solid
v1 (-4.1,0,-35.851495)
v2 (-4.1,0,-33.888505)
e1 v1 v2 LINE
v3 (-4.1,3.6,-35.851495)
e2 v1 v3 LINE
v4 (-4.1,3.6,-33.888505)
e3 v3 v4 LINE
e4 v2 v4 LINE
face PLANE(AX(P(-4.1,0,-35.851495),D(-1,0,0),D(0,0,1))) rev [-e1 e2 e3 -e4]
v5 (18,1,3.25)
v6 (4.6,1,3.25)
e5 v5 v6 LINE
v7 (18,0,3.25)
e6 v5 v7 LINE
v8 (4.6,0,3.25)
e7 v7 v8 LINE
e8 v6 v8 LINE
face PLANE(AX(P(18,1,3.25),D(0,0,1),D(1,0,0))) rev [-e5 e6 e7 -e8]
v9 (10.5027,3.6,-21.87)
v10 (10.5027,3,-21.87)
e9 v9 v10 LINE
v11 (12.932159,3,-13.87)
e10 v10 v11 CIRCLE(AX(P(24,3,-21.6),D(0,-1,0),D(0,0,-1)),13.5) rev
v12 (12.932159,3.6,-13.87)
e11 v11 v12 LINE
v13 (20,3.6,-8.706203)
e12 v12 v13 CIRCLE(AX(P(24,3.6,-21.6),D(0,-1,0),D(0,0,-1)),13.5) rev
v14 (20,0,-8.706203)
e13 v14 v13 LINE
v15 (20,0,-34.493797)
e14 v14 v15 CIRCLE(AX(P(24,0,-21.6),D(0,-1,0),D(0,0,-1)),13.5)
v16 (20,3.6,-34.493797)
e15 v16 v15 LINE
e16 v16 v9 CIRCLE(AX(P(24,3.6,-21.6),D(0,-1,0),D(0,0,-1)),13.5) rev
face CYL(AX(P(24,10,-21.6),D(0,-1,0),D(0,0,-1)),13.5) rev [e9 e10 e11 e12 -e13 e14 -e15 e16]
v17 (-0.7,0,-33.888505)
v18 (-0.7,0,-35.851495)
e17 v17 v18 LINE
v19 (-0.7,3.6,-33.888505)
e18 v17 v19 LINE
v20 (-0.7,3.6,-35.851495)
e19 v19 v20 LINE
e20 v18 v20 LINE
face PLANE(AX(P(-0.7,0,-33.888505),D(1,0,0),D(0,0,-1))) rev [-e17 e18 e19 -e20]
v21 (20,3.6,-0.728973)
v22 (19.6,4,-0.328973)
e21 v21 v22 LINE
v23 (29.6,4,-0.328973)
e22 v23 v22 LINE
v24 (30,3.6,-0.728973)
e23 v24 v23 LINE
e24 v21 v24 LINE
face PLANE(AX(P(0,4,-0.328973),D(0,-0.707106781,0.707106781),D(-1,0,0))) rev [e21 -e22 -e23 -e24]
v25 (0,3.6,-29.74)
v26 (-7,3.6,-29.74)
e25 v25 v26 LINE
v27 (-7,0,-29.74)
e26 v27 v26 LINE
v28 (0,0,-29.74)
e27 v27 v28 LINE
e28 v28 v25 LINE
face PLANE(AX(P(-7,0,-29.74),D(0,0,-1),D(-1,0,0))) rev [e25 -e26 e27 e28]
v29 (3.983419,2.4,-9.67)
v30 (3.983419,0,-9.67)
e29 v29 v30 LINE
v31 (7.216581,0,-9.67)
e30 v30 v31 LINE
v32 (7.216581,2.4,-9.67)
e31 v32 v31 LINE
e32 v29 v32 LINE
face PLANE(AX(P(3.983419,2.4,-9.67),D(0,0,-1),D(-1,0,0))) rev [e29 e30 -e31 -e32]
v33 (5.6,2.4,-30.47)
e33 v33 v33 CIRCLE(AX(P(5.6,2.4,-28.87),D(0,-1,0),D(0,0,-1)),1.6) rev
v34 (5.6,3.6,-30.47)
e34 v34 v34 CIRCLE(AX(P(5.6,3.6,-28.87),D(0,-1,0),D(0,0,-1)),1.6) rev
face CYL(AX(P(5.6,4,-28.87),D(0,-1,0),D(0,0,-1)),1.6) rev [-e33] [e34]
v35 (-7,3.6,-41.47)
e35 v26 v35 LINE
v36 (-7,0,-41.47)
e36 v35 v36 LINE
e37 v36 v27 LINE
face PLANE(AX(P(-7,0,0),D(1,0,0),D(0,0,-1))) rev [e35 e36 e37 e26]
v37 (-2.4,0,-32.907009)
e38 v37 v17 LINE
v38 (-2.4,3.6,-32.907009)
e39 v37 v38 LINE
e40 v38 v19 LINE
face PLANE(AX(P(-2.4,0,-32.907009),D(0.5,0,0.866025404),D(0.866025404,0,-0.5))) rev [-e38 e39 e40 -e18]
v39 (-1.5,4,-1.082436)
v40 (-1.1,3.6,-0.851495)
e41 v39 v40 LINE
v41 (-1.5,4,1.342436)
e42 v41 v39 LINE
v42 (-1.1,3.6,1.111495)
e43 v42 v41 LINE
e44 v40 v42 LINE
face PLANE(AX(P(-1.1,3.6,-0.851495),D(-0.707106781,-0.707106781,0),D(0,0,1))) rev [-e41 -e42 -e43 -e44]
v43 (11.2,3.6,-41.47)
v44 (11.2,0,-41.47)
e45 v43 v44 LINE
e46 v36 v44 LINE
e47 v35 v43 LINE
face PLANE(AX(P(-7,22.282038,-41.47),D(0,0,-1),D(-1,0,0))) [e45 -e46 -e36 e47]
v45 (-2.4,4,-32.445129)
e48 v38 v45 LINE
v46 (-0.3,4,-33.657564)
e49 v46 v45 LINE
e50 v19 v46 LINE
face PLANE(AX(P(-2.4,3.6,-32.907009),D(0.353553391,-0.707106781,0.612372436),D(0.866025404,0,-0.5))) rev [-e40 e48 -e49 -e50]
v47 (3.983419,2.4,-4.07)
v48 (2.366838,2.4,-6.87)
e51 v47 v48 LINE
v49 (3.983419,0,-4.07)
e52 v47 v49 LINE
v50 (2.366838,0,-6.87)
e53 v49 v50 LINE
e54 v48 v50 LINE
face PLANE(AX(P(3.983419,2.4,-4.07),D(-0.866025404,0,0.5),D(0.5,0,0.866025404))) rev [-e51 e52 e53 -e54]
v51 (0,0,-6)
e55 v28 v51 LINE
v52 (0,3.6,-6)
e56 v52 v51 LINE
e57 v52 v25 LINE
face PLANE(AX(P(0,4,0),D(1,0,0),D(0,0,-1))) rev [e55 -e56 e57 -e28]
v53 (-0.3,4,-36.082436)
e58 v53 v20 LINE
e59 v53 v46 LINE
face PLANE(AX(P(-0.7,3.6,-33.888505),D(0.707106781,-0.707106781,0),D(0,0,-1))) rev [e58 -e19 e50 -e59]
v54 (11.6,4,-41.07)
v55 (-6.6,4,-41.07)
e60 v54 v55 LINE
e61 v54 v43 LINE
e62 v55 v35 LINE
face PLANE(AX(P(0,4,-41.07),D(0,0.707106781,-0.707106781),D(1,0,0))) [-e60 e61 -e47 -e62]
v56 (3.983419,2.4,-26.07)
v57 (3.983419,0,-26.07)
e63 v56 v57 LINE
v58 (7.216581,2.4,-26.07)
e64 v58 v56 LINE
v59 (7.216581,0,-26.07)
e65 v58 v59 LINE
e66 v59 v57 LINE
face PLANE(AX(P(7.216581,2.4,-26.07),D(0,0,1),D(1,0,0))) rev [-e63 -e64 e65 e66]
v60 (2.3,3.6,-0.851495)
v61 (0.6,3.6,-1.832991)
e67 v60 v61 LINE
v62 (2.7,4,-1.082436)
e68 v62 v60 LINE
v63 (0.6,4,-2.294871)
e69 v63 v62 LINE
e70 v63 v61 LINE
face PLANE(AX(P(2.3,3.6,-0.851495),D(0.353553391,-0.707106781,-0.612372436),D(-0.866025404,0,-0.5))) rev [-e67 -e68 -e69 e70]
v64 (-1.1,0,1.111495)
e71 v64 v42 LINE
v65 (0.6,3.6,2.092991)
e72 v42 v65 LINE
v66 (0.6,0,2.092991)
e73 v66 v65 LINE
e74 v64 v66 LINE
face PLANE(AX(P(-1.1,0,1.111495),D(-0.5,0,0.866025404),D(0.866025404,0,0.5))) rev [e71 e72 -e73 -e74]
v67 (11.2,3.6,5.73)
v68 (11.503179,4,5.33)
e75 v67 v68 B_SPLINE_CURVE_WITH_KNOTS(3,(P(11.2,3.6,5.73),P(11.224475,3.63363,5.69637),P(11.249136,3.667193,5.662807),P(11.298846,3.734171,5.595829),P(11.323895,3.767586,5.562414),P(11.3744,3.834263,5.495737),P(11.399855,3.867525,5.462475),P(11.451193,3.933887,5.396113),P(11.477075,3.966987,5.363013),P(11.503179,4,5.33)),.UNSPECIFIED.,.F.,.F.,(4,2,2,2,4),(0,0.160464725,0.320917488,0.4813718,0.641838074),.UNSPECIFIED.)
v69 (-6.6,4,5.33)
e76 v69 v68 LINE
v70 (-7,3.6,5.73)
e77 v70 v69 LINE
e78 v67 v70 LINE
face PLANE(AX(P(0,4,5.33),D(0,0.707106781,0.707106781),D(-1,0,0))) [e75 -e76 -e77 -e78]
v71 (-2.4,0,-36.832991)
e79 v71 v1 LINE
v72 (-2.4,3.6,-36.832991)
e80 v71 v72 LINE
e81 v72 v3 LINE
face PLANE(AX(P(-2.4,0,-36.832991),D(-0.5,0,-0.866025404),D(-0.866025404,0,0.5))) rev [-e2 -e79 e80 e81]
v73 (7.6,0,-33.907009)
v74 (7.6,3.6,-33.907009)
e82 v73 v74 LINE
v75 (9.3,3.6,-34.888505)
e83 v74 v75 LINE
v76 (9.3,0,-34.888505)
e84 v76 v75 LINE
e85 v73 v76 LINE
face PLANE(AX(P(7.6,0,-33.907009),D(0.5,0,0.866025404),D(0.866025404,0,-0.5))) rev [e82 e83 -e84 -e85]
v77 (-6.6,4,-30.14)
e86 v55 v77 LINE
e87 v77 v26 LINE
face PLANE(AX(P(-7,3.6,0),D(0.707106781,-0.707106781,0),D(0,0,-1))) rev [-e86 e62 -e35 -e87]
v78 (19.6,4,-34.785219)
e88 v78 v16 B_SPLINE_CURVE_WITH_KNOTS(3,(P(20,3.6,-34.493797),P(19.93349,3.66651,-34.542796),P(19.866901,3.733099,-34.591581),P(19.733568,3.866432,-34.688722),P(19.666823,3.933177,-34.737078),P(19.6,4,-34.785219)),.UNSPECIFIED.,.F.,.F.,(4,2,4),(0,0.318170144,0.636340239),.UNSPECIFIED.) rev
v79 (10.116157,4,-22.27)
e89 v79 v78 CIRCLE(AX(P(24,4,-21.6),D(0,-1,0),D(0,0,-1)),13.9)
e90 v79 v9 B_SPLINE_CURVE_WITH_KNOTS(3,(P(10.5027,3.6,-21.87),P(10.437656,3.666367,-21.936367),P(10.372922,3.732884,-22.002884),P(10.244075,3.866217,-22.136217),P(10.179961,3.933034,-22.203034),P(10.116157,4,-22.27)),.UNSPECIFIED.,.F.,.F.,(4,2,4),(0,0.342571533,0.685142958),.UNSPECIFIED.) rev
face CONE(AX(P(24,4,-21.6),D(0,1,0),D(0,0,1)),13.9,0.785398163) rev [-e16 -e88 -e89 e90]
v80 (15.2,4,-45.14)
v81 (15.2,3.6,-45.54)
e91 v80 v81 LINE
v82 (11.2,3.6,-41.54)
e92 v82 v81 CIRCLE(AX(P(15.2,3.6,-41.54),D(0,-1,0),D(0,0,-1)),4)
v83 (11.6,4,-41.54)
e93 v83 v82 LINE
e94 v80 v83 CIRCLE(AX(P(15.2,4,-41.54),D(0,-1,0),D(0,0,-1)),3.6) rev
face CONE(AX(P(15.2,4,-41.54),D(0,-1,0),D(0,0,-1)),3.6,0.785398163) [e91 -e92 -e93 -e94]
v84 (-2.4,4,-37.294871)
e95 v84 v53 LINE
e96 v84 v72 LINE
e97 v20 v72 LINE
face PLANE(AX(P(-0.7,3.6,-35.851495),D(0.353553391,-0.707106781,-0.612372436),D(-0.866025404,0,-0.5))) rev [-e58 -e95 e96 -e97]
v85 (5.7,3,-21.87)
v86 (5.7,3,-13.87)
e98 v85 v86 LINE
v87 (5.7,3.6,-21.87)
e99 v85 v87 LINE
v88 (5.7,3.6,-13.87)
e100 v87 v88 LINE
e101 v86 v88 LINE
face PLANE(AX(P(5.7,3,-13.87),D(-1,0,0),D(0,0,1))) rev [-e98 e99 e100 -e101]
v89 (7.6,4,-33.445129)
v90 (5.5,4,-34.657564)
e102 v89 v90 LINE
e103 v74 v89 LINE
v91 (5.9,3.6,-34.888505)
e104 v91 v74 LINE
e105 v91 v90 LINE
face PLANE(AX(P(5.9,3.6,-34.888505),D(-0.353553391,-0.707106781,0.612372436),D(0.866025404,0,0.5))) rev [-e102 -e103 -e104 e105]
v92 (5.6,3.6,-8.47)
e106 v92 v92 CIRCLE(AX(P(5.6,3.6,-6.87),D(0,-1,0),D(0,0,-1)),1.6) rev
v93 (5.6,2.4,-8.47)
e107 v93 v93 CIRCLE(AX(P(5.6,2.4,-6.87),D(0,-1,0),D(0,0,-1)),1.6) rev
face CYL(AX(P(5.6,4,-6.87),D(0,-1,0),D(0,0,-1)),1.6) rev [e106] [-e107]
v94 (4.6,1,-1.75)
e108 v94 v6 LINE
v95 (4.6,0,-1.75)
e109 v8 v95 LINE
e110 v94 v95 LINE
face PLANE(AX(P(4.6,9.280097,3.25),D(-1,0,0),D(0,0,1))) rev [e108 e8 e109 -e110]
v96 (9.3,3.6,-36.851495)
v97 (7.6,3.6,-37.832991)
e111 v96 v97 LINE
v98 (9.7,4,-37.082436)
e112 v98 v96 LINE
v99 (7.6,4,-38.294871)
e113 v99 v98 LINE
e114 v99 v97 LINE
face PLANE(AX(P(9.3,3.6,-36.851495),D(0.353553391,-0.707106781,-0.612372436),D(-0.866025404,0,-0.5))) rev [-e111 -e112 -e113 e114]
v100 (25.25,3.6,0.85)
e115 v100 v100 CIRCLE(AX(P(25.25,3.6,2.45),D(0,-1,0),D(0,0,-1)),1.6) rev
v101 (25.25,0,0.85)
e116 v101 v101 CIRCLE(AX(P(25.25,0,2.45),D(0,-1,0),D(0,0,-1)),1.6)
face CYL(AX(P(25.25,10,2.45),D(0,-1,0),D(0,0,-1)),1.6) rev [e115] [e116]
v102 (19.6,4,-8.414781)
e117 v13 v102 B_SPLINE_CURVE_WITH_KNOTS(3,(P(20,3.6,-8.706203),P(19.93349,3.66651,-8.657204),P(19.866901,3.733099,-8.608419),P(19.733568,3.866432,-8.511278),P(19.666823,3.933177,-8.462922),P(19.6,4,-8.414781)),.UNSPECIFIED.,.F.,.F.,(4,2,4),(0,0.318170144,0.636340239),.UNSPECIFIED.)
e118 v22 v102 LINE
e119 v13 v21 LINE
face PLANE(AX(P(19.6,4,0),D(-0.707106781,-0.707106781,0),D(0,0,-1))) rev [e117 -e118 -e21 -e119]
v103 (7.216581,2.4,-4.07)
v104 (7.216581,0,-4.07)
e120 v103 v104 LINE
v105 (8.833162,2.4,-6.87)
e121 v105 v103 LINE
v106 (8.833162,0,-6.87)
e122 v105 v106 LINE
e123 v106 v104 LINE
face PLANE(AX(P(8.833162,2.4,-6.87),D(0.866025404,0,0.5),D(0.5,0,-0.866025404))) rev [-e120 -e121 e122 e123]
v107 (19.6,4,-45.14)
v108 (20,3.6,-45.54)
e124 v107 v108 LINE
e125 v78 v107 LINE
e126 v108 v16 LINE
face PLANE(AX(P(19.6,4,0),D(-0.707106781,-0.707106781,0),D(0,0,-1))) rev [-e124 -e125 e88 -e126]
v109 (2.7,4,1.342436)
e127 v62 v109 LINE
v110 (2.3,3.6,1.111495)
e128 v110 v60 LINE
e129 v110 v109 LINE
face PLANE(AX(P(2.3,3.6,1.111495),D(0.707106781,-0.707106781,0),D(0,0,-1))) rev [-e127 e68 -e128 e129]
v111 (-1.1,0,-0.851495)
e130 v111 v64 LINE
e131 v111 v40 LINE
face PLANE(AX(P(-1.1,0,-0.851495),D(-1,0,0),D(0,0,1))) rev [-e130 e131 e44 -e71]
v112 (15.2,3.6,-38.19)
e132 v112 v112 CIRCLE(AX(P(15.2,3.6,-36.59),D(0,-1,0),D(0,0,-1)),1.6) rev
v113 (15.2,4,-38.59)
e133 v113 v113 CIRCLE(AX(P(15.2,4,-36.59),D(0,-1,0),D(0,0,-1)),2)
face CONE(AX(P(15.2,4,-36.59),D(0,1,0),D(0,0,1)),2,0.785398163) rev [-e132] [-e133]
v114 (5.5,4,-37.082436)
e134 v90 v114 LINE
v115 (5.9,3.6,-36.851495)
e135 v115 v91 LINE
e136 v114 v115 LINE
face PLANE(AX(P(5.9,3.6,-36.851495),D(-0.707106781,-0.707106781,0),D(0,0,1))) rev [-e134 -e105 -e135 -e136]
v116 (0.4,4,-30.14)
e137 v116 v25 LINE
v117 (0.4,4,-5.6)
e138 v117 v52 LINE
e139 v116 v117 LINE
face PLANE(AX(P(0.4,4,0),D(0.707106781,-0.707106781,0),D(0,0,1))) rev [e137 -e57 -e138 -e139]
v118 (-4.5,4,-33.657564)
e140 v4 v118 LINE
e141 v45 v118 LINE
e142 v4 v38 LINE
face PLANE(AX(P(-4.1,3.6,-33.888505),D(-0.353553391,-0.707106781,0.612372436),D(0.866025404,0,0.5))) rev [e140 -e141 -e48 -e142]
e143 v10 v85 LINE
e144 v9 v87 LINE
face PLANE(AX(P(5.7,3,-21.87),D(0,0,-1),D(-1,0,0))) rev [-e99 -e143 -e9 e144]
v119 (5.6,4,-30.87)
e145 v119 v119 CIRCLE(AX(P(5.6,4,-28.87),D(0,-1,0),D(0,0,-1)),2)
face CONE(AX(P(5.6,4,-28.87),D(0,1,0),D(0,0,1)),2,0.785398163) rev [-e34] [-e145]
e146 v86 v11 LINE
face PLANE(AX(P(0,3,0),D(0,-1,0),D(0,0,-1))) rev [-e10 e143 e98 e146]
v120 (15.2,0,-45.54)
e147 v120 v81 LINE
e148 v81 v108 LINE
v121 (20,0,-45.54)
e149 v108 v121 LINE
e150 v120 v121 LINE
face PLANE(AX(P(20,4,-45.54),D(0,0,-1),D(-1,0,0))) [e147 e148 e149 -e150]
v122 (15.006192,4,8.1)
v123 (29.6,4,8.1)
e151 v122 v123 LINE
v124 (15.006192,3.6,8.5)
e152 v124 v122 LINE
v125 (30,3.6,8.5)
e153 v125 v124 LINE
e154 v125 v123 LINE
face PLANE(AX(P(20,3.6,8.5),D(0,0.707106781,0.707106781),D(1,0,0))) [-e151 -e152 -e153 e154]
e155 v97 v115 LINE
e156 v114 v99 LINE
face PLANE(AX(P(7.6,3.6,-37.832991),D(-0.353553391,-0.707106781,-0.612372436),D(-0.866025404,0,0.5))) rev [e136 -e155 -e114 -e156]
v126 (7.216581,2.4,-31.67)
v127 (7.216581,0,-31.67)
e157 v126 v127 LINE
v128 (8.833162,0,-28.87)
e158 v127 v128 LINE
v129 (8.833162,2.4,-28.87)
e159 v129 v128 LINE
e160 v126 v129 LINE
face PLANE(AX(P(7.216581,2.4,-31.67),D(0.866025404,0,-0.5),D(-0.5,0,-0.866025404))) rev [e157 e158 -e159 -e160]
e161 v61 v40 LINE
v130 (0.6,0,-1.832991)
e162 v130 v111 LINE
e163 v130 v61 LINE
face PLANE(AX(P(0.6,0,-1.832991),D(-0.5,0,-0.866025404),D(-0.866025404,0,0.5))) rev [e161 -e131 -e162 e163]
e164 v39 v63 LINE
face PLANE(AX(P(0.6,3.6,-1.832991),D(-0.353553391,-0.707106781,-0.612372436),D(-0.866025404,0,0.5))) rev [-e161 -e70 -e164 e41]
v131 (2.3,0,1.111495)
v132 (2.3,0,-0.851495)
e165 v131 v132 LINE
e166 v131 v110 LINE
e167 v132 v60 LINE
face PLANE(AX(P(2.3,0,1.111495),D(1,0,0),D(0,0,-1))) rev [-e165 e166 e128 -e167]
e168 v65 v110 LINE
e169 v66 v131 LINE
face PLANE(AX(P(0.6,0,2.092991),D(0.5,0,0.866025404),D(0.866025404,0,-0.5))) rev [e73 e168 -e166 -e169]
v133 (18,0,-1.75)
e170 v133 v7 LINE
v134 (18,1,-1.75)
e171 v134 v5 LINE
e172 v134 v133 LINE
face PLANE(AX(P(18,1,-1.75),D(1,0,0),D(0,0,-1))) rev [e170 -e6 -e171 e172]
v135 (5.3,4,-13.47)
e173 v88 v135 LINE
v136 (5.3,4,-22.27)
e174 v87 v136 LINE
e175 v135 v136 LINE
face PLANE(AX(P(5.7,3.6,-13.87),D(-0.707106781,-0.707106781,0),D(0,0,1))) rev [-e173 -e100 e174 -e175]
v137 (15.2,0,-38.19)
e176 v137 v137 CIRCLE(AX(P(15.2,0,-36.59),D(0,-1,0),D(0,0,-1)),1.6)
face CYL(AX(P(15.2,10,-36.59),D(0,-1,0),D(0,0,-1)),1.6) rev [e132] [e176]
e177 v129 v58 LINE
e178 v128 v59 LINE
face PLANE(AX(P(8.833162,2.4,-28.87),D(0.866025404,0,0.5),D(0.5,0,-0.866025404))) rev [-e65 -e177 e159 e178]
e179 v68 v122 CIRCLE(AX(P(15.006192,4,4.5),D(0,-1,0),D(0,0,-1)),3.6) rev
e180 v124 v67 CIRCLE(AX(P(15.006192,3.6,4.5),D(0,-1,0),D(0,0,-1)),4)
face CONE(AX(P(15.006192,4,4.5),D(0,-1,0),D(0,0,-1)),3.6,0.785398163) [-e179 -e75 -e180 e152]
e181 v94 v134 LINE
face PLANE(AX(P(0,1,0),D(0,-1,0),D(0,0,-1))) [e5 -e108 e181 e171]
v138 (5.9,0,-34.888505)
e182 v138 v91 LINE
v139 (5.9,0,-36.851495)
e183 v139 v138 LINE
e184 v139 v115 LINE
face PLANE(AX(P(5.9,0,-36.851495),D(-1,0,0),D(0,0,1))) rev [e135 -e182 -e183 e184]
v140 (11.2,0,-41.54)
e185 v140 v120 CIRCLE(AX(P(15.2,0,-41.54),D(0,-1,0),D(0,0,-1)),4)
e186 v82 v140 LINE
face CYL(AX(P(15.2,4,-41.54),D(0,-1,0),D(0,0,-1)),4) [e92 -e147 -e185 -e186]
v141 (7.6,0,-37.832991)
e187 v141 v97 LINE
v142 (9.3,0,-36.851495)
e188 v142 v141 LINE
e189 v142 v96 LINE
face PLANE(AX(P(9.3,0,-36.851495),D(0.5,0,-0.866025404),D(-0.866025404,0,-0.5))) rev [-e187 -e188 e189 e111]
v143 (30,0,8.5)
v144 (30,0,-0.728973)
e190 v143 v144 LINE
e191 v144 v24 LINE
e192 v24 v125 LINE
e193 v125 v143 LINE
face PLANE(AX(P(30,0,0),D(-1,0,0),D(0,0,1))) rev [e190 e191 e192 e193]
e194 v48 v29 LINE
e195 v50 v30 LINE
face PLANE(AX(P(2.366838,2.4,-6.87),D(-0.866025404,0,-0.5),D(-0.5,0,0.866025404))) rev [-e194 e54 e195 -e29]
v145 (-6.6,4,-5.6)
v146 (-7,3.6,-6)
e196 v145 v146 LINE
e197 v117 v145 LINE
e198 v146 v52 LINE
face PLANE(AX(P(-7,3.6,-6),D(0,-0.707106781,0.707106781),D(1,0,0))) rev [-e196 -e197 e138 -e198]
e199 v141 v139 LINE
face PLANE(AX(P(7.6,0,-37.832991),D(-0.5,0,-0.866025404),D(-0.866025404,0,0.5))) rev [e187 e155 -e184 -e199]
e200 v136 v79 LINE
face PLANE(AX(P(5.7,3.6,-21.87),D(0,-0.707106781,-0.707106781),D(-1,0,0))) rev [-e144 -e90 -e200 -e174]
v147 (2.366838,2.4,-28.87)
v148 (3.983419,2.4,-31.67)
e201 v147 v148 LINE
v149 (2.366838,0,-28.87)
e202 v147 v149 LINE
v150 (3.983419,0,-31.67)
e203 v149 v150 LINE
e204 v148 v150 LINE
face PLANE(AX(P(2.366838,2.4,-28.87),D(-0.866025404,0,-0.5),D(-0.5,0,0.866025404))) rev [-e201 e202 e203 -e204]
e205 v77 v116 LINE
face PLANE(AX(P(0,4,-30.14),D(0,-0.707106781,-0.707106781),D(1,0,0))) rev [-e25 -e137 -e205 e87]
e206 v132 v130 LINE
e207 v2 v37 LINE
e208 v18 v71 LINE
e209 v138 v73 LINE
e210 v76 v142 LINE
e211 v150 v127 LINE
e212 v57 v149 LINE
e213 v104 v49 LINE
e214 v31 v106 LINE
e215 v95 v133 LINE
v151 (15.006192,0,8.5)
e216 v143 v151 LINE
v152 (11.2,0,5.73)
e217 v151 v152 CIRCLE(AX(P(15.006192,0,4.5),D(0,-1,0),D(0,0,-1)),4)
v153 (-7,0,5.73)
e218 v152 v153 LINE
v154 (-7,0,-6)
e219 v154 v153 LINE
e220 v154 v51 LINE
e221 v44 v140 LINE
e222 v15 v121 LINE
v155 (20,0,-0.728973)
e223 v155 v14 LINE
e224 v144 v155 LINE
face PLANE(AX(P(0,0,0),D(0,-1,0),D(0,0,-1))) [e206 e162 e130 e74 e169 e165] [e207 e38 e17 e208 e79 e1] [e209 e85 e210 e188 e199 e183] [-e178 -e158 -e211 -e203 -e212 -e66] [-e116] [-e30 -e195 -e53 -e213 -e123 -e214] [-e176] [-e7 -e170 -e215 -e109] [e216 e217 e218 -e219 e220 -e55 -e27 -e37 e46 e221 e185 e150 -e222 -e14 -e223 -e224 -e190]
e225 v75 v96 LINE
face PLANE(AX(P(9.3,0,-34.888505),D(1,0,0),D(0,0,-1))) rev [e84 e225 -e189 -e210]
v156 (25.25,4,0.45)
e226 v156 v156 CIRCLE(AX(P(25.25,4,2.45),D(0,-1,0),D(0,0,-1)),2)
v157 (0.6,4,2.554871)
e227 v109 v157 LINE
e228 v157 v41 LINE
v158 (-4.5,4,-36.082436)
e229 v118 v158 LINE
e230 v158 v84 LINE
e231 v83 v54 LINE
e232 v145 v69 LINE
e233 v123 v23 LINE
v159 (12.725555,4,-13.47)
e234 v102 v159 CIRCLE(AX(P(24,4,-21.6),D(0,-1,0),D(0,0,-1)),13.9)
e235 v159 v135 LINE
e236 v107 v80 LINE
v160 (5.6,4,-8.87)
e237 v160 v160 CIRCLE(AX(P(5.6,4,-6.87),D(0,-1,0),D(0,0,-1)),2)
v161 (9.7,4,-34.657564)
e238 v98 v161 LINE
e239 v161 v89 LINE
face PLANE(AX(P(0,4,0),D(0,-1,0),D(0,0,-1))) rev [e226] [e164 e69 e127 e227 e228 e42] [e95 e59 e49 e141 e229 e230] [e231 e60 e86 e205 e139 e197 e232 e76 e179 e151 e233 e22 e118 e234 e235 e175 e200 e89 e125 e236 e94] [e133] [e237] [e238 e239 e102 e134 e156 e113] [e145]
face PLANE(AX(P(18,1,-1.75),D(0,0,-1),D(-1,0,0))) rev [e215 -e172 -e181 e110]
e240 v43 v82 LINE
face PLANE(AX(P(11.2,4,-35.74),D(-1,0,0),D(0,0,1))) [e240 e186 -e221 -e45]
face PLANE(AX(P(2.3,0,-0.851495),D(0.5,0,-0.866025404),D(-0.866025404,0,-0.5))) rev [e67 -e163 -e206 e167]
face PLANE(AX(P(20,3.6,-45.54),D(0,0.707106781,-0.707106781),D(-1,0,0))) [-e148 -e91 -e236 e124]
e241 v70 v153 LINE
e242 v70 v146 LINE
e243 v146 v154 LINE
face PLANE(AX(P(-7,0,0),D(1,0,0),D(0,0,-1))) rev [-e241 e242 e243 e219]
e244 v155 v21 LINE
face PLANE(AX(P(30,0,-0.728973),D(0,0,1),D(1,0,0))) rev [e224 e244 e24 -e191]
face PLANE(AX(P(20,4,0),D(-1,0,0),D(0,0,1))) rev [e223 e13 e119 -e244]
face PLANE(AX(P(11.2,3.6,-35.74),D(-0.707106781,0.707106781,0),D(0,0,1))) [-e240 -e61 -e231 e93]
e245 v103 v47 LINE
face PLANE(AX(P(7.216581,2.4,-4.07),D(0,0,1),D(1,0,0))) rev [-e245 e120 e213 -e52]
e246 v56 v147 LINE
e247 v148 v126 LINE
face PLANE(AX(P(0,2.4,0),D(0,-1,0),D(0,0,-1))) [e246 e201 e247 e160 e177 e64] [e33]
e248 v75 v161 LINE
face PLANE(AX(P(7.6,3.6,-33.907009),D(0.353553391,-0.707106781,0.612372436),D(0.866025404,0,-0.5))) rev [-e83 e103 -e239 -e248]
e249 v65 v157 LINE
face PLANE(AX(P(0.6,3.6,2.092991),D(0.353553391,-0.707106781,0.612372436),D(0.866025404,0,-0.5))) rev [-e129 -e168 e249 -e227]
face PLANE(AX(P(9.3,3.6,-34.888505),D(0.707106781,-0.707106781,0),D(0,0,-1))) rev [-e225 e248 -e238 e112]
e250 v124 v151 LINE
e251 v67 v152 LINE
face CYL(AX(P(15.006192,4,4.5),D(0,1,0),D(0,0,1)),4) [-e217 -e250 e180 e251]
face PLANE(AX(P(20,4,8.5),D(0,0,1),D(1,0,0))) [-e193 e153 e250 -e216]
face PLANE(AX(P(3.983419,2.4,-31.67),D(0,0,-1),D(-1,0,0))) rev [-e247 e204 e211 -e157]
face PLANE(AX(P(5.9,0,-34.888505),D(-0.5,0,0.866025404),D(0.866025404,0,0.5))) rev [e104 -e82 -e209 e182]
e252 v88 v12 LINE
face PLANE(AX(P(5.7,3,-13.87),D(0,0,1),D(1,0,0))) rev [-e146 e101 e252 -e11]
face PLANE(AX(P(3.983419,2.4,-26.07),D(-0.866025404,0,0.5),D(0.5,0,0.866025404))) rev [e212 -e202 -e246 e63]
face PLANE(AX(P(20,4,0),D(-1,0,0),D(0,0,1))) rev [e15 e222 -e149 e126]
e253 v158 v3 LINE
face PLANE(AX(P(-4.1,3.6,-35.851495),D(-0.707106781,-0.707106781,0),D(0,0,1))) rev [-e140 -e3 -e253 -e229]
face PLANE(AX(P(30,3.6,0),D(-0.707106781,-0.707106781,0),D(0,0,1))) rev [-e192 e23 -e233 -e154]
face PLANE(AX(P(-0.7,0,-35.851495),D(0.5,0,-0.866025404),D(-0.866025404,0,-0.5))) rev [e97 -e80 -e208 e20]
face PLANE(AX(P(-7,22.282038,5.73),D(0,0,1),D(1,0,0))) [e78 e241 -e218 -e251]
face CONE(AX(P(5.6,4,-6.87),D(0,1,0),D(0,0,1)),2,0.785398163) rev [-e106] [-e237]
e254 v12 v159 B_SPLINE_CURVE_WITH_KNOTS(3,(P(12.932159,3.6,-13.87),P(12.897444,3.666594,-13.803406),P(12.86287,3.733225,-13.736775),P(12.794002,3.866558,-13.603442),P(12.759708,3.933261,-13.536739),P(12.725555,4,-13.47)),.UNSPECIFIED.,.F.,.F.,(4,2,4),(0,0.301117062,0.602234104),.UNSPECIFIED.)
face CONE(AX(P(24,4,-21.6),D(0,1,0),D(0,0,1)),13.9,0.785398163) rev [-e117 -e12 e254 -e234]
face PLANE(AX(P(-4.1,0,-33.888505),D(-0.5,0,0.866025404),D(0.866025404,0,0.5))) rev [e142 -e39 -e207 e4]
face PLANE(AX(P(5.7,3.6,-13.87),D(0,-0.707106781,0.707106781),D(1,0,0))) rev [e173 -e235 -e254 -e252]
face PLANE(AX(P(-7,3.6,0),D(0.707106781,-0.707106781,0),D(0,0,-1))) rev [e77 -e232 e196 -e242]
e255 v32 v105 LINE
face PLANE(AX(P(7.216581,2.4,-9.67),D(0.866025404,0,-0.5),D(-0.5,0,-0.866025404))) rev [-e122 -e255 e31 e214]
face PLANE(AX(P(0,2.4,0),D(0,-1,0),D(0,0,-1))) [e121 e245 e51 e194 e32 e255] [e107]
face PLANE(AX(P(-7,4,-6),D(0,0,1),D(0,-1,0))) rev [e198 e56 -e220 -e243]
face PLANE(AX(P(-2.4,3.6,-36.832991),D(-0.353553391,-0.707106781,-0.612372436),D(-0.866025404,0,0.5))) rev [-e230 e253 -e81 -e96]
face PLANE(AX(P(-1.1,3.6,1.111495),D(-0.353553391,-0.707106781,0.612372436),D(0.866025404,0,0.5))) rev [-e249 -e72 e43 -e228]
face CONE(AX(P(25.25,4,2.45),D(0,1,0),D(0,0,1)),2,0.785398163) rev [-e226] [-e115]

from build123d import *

# Parameters (mm, degrees)
SKETCH_1_W           = 20
SKETCH_1_H           = 35.74
EXTRUDE_1_DEPTH      = 4
SKETCH_2_W           = 8.8
SKETCH_2_H           = 8.5
SKETCH_2_H_2         = 9.8
EXTRUDE_2_DEPTH      = 4
SKETCH_3_R           = 13.5
CUT_EXTRUDE_1_DEPTH  = 10
SKETCH_4_W           = 9
SKETCH_4_H           = 5
CUT_EXTRUDE_2_DEPTH  = 1
SKETCH_5_W           = 9.228972975
SKETCH_5_H           = 4
EXTRUDE_3_DEPTH      = 10
SKETCH_6_R           = 1.6
CUT_EXTRUDE_3_DEPTH  = 10
SKETCH_7_R           = 1.6
CUT_EXTRUDE_4_DEPTH  = 55.679901244
SKETCH_8_W           = 11.2
SKETCH_8_H           = 4
EXTRUDE_4_DEPTH      = 4
SKETCH_9_R           = 1.65
CUT_EXTRUDE_5_DEPTH  = 55.679901244
SKETCH_10_W          = 10
SKETCH_10_H          = 4
EXTRUDE_5_DEPTH      = 7
SKETCH_11_R          = 1.65
CUT_EXTRUDE_6_DEPTH  = 8
SKETCH_12_W          = 6.6
SKETCH_12_H          = 5
CUT_EXTRUDE_7_DEPTH  = 1
SKETCH_13_R          = 1.55
CUT_EXTRUDE_8_DEPTH  = 5
SKETCH_14_W          = 18.2
SKETCH_14_H          = 1.73
EXTRUDE_6_DEPTH      = 4
SKETCH_16_W          = 10
SKETCH_16_H          = 8
CUT_EXTRUDE_9_DEPTH  = 1
CUT_EXTRUDE_10_DEPTH = 2.4
FILLET_1_R           = 4
CUT_EXTRUDE_11_DEPTH = 55.679901244
CHAMFER_1_SIZE       = 0.4


with BuildPart() as part:
    # 草图1 → 凸台-拉伸1 (new body)
    with BuildSketch(Plane(origin=(0, 0, 0), x_dir=(1, 0, 0), z_dir=(0, 1, 0))):
        with Locations((10, 17.87)):
            Rectangle(SKETCH_1_W, SKETCH_1_H)
    extrude(amount=EXTRUDE_1_DEPTH)

    # 草图2 → 凸台-拉伸2 (add)
    with BuildSketch(Plane.XZ):
        with Locations((15.6, 4.25)):
            Rectangle(SKETCH_2_W, SKETCH_2_H)
        with Locations((15.6, -40.64)):
            Rectangle(SKETCH_2_W, SKETCH_2_H_2)
    extrude(amount=-EXTRUDE_2_DEPTH)

    # 草图3 → 切除-拉伸1 (cut)
    with BuildSketch(Plane(origin=(0, 0, 0), x_dir=(-1, 0, 0), z_dir=(0, -1, 0))):
        with Locations((-24, 21.6)):
            Circle(SKETCH_3_R)
    extrude(amount=-CUT_EXTRUDE_1_DEPTH, mode=Mode.SUBTRACT)

    # 草图4 → 切除-拉伸2 (cut)
    with BuildSketch(Plane(origin=(0, 0, 0), x_dir=(-1, 0, 0), z_dir=(0, -1, 0))):
        with Locations((-13.5, -0.75)):
            Rectangle(SKETCH_4_W, SKETCH_4_H)
    extrude(amount=-CUT_EXTRUDE_2_DEPTH, mode=Mode.SUBTRACT)

    # 草图5 → 凸台-拉伸3 (add)
    with BuildSketch(Plane(origin=(20, 0, 0), x_dir=(0, 0, -1), z_dir=(1, 0, 0))):
        with Locations((-3.885513513, 2)):
            Rectangle(SKETCH_5_W, SKETCH_5_H)
    extrude(amount=EXTRUDE_3_DEPTH)

    # 草图6 → 切除-拉伸3 (cut)
    with BuildSketch(Plane(origin=(0, 0, 0), x_dir=(-1, 0, 0), z_dir=(0, -1, 0))):
        with Locations(Location((-15.2, 36.59, 0), (0, 0, 90))):
            Circle(SKETCH_6_R)
        with Locations(Location((-25.25, -2.45, 0), (0, 0, 90))):
            Circle(SKETCH_6_R)
    extrude(amount=-CUT_EXTRUDE_3_DEPTH, mode=Mode.SUBTRACT)

    # 草图7 → 切除-拉伸4 (cut, through all)
    with BuildSketch(Plane(origin=(0, 0, 0), x_dir=(-1, 0, 0), z_dir=(0, -1, 0))):
        with Locations(Location((-5.6, 28.87, 0), (0, 0, 90))):
            Circle(SKETCH_7_R)
        with Locations(Location((-5.6, 6.87, 0), (0, 0, 90))):
            Circle(SKETCH_7_R)
    extrude(amount=-CUT_EXTRUDE_4_DEPTH, mode=Mode.SUBTRACT)

    # 草图8 → 凸台-拉伸4 (add)
    with BuildSketch(Plane.XZ):
        with Locations((5.6, -37.74)):
            Rectangle(SKETCH_8_W, SKETCH_8_H)
        with Locations((5.6, 2)):
            Rectangle(SKETCH_8_W, SKETCH_8_H)
    extrude(amount=-EXTRUDE_4_DEPTH)

    # 草图9 → 切除-拉伸5 (cut, through all)
    with BuildSketch(Plane(origin=(0, 0, 0), x_dir=(-1, 0, 0), z_dir=(0, -1, 0))):
        with Locations(Location((-7.6, 35.87, 0), (0, 0, 90))):
            Circle(SKETCH_9_R)
        with Locations((-0.6, -0.13)):
            Circle(SKETCH_9_R)
    extrude(amount=-CUT_EXTRUDE_5_DEPTH, mode=Mode.SUBTRACT)

    # 草图10 → 凸台-拉伸5 (add)
    with BuildSketch(Plane.ZY):
        with Locations((-34.74, 2)):
            Rectangle(SKETCH_10_W, SKETCH_10_H)
        with Locations((-1, 2)):
            Rectangle(SKETCH_10_W, SKETCH_10_H)
    extrude(amount=EXTRUDE_5_DEPTH)

    # 草图11 → 切除-拉伸6 (cut)
    with BuildSketch(Plane(origin=(0, 0, 0), x_dir=(-1, 0, 0), z_dir=(0, -1, 0))):
        with Locations(Location((2.4, 34.87, 0), (0, 0, 90))):
            Circle(SKETCH_11_R)
    extrude(amount=-CUT_EXTRUDE_6_DEPTH, mode=Mode.SUBTRACT)

    # 草图12 → 切除-拉伸7 (cut)
    with BuildSketch(Plane(origin=(0, 0, 0), x_dir=(-1, 0, 0), z_dir=(0, -1, 0))):
        with Locations((-7.9, -0.75)):
            Rectangle(SKETCH_12_W, SKETCH_12_H)
    extrude(amount=-CUT_EXTRUDE_7_DEPTH, mode=Mode.SUBTRACT)

    # 草图13 → 切除-拉伸8 (cut)
    with BuildSketch(Plane(origin=(0, 0, 0), x_dir=(-1, 0, 0), z_dir=(0, -1, 0))):
        with Locations((-0.6, -0.13)):
            Circle(SKETCH_13_R)
    extrude(amount=-CUT_EXTRUDE_8_DEPTH, mode=Mode.SUBTRACT)

    # 草图14 → 凸台-拉伸6 (add)
    with BuildSketch(Plane(origin=(0, 0, 0), x_dir=(-1, 0, 0), z_dir=(0, -1, 0))):
        with Locations((-2.1, -4.865)):
            Rectangle(SKETCH_14_W, SKETCH_14_H)
        with Locations((-2.1, 40.605)):
            Rectangle(SKETCH_14_W, SKETCH_14_H)
    extrude(amount=-EXTRUDE_6_DEPTH)

    # 草图16 → 切除-拉伸9 (cut)
    with BuildSketch(Plane(origin=(0, 4, 0), x_dir=(1, 0, 0), z_dir=(0, 1, 0))):
        with Locations((10.7, 17.87)):
            Rectangle(SKETCH_16_W, SKETCH_16_H)
    extrude(amount=-CUT_EXTRUDE_9_DEPTH, mode=Mode.SUBTRACT)

    # 草图17 → 切除-拉伸10 (cut)
    with BuildSketch(Plane(origin=(0, 0, 0), x_dir=(-1, 0, 0), z_dir=(0, -1, 0))):
        Polygon((-8.833161507, 28.87), (-7.216580754, 26.07), (-3.983419246, 26.07), (-2.366838493, 28.87), (-3.983419246, 31.67), (-7.216580754, 31.67), align=None)
        Polygon((-8.833161507, 6.87), (-7.216580754, 4.07), (-3.983419246, 4.07), (-2.366838493, 6.87), (-3.983419246, 9.67), (-7.216580754, 9.67), align=None)
    extrude(amount=-CUT_EXTRUDE_10_DEPTH, mode=Mode.SUBTRACT)

    # 圆角1
    # the kernel refuses this fillet: 4 mm, written as the material it takes off along each edge
    with BuildSketch(Plane(origin=(11.2, -9.515480808, 8.5), x_dir=(1, 0, 0), z_dir=(0, 1, 0))) as fillet_1_piece_1:
        with BuildLine():
            CenterArc((3.806192323, 4), FILLET_1_R, 197.908633295, 72.091366705)
            Line((0, 2.77), (-0.076123846, 2.7454))
            ThreePointArc((-0.076123846, 2.7454), (-0.08, 1.385), (-0.08, 0))
            Line((-0.08, 0), (0, -0.08))
            Line((0, -0.08), (3.806192323, -0.08))
            Line((3.806192323, -0.08), (3.806192323, 0))
        make_face()
    extrude(amount=23.030961615, mode=Mode.SUBTRACT)
    with BuildSketch(Plane(origin=(11.2, -10, -45.54), x_dir=(0, 0, 1), z_dir=(0, 1, 0))) as fillet_1_piece_2:
        with BuildLine():
            CenterArc((FILLET_1_R, FILLET_1_R), FILLET_1_R, 180, 90)
            Line((0, FILLET_1_R), (-FILLET_1_R * 0.02, FILLET_1_R))
            Line((-FILLET_1_R * 0.02, FILLET_1_R), (-FILLET_1_R * 0.02, -FILLET_1_R * 0.02))
            Line((-FILLET_1_R * 0.02, -FILLET_1_R * 0.02), (FILLET_1_R, -FILLET_1_R * 0.02))
            Line((FILLET_1_R, -FILLET_1_R * 0.02), (FILLET_1_R, 0))
        make_face()
    extrude(amount=24, mode=Mode.SUBTRACT)

    # 草图19 → 切除-拉伸11 (cut, through all)
    with BuildSketch(Plane(origin=(0, 4, 0), x_dir=(1, 0, 0), z_dir=(0, 1, 0))):
        Polygon((0.6, -2.092990915), (2.3, -1.111495458), (2.3, 0.851495458), (0.6, 1.832990915), (-1.1, 0.851495458), (-1.1, -1.111495458), align=None)
        Polygon((-2.4, 32.907009085), (-0.7, 33.888504542), (-0.7, 35.851495458), (-2.4, 36.832990915), (-4.1, 35.851495458), (-4.1, 33.888504542), align=None)
        Polygon((7.6, 33.907009085), (9.3, 34.888504542), (9.3, 36.851495458), (7.6, 37.832990915), (5.9, 36.851495458), (5.9, 34.888504542), align=None)
    extrude(amount=-CUT_EXTRUDE_11_DEPTH, mode=Mode.SUBTRACT)

    # 倒角1
    chamfer_1_edges = [part.edges().sort_by_distance(p)[0] for p in [
        (5.6, 4, -5.27),
        (0, 4, -17.87),
        (-3.5, 4, -29.74),
        (-7, 4, -35.605),
        (22.503096162, 4, 8.5),
        (-3.5, 4, -6),
        (-7, 4, -0.135),
        (2.1, 4, 5.73),
        (11.2, 4, -41.505),
        (2.1, 4, -41.47),
        (13.212093026, 4, -29.716099009),
        (8.101350135, 4, -21.87),
        (5.7, 4, -17.87),
        (9.316079599, 4, -13.87),
        (17.6, 4, -45.54),
        (12.371572875, 4, -44.368427125),
        (12.652471864, 4, 7.734192326),
        (-0.25, 4, 1.602243186),
        (1.45, 4, 1.602243186),
        (2.3, 4, 0.13),
        (1.45, 4, -1.342243186),
        (-0.25, 4, -1.342243186),
        (-1.1, 4, 0.13),
        (-3.25, 4, -33.397756814),
        (-1.55, 4, -33.397756814),
        (-0.7, 4, -34.87),
        (-1.55, 4, -36.342243186),
        (-3.25, 4, -36.342243186),
        (-4.1, 4, -34.87),
        (6.75, 4, -34.397756814),
        (8.45, 4, -34.397756814),
        (9.3, 4, -35.87),
        (8.45, 4, -37.342243186),
        (6.75, 4, -37.342243186),
        (5.9, 4, -35.87),
        (20, 4, -40.016898479),
        (16.035945985, 4, -10.699364989),
        (20, 4, -4.717588008),
        (25, 4, -0.728972975),
        (30, 4, 3.885513513),
        (15.2, 4, -34.99),
        (25.25, 4, 4.05),
        (5.6, 4, -27.27),
    ]]
    chamfer(chamfer_1_edges, length=CHAMFER_1_SIZE)


solid = part.part
